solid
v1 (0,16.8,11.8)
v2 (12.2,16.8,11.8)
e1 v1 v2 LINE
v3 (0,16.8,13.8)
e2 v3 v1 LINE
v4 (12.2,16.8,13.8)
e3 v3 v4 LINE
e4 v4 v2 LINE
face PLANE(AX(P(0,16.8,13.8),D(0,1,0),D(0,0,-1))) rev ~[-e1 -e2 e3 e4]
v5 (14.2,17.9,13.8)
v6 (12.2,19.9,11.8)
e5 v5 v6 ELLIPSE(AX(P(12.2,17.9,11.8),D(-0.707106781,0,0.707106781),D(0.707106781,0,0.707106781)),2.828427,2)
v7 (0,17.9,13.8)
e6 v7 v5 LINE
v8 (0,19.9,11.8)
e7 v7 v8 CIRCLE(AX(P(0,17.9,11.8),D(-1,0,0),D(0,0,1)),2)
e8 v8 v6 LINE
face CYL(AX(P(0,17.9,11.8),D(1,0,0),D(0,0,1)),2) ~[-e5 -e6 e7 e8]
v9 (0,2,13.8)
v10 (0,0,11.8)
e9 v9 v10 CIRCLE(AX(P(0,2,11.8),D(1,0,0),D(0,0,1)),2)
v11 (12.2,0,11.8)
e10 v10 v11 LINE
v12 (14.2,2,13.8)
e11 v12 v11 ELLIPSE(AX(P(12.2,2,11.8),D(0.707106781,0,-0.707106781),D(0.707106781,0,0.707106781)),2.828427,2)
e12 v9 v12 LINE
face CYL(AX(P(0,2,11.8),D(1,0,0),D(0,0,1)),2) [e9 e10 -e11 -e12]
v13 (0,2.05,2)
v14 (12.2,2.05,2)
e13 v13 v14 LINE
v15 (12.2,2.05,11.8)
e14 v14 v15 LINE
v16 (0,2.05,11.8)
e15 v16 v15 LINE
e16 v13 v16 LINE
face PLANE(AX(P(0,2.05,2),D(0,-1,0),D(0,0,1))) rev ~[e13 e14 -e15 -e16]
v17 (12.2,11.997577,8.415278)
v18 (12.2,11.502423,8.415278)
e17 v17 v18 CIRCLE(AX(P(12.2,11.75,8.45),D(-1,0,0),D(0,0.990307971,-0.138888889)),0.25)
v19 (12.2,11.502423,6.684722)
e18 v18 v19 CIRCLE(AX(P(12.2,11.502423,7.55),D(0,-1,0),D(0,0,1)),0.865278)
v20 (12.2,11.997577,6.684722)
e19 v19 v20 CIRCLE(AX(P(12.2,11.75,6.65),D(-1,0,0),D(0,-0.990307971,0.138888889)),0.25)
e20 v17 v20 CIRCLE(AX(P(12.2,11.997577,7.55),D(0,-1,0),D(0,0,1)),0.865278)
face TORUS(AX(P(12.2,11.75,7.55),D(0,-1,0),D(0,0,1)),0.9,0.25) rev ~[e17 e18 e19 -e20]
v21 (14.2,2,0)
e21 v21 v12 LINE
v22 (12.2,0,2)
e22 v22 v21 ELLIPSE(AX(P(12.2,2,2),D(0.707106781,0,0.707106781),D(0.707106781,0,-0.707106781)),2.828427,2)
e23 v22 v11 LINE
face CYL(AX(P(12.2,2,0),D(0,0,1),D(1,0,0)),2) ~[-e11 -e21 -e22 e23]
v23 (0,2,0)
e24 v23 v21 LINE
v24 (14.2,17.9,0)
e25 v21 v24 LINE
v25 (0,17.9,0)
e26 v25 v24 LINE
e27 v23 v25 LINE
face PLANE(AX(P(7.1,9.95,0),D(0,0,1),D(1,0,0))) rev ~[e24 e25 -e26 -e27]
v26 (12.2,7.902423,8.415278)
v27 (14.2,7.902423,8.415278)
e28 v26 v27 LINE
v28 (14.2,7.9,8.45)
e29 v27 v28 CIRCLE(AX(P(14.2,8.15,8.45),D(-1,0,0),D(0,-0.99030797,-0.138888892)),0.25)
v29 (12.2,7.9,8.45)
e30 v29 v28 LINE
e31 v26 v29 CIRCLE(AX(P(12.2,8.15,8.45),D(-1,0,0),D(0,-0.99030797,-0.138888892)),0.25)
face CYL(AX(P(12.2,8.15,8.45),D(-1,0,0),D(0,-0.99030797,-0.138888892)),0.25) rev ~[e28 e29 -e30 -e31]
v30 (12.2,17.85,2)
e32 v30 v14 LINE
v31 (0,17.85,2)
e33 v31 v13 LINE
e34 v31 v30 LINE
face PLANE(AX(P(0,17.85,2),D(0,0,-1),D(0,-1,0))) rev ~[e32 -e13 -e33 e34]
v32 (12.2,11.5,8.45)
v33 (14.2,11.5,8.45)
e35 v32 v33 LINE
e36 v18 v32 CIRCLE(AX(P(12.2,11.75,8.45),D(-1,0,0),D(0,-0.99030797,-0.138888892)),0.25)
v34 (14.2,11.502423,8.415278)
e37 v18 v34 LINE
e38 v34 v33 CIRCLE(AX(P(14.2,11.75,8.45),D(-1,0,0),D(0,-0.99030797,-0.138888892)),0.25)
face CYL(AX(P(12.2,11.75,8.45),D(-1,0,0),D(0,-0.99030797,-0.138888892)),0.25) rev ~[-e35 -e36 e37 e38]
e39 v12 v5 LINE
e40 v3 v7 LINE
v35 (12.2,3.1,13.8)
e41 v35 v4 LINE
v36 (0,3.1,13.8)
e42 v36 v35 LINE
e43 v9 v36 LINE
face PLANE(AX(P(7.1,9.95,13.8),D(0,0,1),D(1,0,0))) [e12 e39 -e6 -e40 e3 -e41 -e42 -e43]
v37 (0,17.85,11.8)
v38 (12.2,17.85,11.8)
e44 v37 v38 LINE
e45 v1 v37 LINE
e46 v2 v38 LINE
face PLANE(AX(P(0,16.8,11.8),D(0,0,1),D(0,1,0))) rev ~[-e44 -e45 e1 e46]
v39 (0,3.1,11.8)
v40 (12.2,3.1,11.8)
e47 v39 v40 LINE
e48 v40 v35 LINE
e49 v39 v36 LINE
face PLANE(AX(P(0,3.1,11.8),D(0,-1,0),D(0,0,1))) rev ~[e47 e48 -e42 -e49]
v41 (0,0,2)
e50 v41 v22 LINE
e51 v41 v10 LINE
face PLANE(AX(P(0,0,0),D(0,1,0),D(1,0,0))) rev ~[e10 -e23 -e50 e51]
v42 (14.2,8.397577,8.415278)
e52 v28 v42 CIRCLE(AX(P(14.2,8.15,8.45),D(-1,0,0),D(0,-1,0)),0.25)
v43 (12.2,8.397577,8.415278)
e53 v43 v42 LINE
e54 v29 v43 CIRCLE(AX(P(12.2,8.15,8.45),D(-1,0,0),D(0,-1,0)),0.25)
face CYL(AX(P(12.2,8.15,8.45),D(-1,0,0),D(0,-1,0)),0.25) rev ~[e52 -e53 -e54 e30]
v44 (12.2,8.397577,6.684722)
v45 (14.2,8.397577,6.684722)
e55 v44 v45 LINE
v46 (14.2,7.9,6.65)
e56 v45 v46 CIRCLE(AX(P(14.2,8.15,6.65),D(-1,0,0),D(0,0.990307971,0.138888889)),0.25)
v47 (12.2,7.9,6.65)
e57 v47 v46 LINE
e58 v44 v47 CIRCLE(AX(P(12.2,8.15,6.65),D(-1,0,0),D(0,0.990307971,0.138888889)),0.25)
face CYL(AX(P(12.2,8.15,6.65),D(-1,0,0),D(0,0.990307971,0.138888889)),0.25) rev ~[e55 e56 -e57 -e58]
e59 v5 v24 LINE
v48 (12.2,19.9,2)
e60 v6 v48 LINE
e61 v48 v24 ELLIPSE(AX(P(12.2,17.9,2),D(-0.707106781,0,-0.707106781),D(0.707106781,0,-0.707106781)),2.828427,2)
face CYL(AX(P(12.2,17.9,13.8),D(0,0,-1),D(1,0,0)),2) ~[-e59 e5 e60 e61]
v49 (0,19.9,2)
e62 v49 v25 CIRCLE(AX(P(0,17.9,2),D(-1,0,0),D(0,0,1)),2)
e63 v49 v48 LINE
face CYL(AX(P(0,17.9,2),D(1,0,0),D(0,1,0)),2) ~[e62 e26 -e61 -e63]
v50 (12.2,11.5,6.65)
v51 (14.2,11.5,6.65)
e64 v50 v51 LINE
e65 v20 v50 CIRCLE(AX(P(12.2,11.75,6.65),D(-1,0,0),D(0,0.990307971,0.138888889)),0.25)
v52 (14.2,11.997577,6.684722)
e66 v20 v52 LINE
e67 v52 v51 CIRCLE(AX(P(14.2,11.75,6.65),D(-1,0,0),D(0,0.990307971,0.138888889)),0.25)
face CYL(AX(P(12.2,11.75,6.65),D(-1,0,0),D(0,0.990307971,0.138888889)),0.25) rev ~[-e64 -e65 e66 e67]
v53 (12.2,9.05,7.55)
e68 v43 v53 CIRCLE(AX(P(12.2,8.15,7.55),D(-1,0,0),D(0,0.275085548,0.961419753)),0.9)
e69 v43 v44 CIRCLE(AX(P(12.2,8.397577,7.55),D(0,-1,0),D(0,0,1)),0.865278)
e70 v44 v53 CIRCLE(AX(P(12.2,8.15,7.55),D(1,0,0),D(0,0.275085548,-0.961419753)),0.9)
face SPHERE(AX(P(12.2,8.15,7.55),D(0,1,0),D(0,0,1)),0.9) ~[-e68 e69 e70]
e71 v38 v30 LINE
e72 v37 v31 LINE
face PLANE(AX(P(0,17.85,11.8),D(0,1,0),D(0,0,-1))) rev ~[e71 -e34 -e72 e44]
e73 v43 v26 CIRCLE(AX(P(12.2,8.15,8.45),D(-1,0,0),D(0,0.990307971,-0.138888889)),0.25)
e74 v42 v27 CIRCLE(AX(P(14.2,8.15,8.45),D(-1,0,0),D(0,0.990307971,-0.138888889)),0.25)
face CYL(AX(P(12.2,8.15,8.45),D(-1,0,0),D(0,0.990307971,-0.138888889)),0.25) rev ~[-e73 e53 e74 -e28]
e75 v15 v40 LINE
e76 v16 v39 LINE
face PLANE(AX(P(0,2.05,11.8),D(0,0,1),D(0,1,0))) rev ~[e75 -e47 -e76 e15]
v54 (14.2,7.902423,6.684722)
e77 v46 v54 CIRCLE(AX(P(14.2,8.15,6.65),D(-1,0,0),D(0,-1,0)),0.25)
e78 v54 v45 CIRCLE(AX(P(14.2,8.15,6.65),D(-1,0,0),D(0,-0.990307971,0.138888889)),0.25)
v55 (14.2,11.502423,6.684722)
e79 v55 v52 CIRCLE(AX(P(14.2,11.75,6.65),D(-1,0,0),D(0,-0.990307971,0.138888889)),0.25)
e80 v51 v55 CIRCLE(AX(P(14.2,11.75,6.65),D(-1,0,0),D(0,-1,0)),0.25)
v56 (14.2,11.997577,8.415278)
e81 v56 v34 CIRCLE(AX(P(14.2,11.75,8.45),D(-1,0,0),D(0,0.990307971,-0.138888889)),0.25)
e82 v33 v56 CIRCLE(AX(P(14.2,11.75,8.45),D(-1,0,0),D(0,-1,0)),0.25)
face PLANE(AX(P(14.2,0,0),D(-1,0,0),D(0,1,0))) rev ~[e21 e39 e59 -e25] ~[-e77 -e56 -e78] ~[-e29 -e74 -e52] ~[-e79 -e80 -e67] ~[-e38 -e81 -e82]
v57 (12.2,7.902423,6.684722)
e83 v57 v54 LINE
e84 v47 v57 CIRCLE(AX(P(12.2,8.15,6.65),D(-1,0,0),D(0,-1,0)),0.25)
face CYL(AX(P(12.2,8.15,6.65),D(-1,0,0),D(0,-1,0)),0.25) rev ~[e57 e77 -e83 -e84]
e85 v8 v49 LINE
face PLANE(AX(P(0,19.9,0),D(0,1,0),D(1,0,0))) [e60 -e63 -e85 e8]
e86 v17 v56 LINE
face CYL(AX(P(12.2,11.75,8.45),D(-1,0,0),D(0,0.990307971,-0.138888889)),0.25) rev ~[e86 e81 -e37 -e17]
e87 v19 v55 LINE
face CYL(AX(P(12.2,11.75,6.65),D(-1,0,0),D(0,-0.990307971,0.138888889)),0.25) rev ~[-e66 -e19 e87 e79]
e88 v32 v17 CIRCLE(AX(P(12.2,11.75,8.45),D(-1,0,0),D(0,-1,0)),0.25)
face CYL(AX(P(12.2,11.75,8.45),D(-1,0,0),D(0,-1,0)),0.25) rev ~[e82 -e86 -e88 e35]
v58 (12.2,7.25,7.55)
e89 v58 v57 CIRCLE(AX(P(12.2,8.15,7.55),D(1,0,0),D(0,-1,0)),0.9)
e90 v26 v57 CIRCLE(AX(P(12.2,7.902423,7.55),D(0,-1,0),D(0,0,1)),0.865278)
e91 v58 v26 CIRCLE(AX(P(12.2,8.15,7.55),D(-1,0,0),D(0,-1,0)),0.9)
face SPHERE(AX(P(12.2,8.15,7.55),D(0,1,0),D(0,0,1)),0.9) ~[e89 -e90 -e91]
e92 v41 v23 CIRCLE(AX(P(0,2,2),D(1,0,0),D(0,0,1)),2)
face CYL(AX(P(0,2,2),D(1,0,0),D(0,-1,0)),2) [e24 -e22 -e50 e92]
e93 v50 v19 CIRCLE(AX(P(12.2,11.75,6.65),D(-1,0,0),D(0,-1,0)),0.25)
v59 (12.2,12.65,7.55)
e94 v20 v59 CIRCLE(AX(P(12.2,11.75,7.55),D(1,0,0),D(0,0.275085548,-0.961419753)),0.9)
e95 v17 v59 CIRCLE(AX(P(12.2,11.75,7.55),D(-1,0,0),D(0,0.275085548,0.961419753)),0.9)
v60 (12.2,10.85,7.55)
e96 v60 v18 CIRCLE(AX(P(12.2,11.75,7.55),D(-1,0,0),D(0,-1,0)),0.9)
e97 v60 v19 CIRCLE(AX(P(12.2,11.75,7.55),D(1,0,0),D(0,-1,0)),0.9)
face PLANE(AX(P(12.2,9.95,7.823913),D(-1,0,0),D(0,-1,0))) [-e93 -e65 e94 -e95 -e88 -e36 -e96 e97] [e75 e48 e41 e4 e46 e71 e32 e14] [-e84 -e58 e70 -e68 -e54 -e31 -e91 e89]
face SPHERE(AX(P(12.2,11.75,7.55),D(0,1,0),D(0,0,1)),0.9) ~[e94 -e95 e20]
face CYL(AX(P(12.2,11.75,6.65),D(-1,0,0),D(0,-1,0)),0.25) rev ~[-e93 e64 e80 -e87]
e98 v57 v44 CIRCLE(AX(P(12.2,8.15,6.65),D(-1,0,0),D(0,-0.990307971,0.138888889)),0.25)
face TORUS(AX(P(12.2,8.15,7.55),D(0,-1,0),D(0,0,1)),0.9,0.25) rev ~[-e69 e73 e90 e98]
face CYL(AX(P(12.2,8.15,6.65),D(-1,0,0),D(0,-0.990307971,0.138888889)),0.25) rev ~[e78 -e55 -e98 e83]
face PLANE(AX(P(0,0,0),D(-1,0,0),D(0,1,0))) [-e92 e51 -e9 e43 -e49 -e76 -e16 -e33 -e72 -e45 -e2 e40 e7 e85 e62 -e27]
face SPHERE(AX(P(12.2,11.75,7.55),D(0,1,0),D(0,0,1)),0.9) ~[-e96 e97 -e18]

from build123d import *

# Parameters (mm, degrees)
F0_W     = 14.2
F0_H     = 19.9
F1_DEPTH = 13.8
F2_DEPTH = 12
F4_DEPTH = 12.2
F6_DEPTH = 2.001
F7_ANGLE = 180
F8_R     = 2


with BuildPart() as f1:
    # F0 (on Top) → F1 (new body)
    with BuildSketch(Plane.XY):
        with Locations((7.1, 9.95)):
            Rectangle(F0_W, F0_H)
    extrude(amount=F1_DEPTH)

    # F0 (on Top) → F2 (join)
    with BuildSketch(Plane.XY):
        with Locations((7.1, 9.95)):
            Rectangle(F0_W, F0_H)
    extrude(amount=F2_DEPTH)

    # F3 (on face) → F4 (cut)
    with BuildSketch(Plane(origin=(0, 0, 0), x_dir=(0, -1, 0), z_dir=(-1, 0, 0))):
        Polygon((-3.1, 13.8), (-16.8, 13.8), (-16.8, 11.8), (-17.85, 11.8), (-17.85, 2), (-2.05, 2), (-2.05, 11.8), (-3.1, 11.8), align=None)
    extrude(amount=-F4_DEPTH, mode=Mode.SUBTRACT)

    # F5 (on face) → F6 (cut, through all)
    with BuildSketch(Plane(origin=(12.2, 0, 0), x_dir=(0, -1, 0), z_dir=(-1, 0, 0))):
        with BuildLine():
            ThreePointArc((-11.9975769926, 8.4152777778), (-11.75, 8.2), (-11.5024230074, 8.4152777778))
            ThreePointArc((-11.5024230074, 8.4152777778), (-11.75, 8.45), (-11.9975769926, 8.4152777778))
        make_face()
        with BuildLine():
            ThreePointArc((-11.9975769926, 8.4152777778), (-11.75, 8.45), (-11.5024230074, 8.4152777778))
            ThreePointArc((-11.5024230074, 8.4152777778), (-11.5006064875, 8.4325966693), (-11.5, 8.45))
            ThreePointArc((-11.5, 8.45), (-11.7674033307, 8.6993935125), (-11.9975769926, 8.4152777778))
        make_face()
        with BuildLine():
            ThreePointArc((-8.3975769926, 8.4152777778), (-8.15, 8.2), (-7.9024230074, 8.4152777778))
            ThreePointArc((-7.9024230074, 8.4152777778), (-8.15, 8.45), (-8.3975769926, 8.4152777778))
        make_face()
        with BuildLine():
            ThreePointArc((-8.3975769926, 8.4152777778), (-8.15, 8.45), (-7.9024230074, 8.4152777778))
            ThreePointArc((-7.9024230074, 8.4152777778), (-7.9006064875, 8.4325966693), (-7.9, 8.45))
            ThreePointArc((-7.9, 8.45), (-8.1674033307, 8.6993935125), (-8.3975769926, 8.4152777778))
        make_face()
        with BuildLine():
            ThreePointArc((-8.3975769926, 6.6847222222), (-8.15, 6.65), (-7.9024230074, 6.6847222222))
            ThreePointArc((-7.9024230074, 6.6847222222), (-8.15, 6.9), (-8.3975769926, 6.6847222222))
        make_face()
        with BuildLine():
            ThreePointArc((-7.9, 6.65), (-7.9006064875, 6.6674033307), (-7.9024230074, 6.6847222222))
            ThreePointArc((-7.9024230074, 6.6847222222), (-8.15, 6.65), (-8.3975769926, 6.6847222222))
            ThreePointArc((-8.3975769926, 6.6847222222), (-8.1674033307, 6.4006064875), (-7.9, 6.65))
        make_face()
        with BuildLine():
            ThreePointArc((-11.9975769926, 6.6847222222), (-11.75, 6.65), (-11.5024230074, 6.6847222222))
            ThreePointArc((-11.5024230074, 6.6847222222), (-11.75, 6.9), (-11.9975769926, 6.6847222222))
        make_face()
        with BuildLine():
            ThreePointArc((-11.5, 6.65), (-11.5006064875, 6.6674033307), (-11.5024230074, 6.6847222222))
            ThreePointArc((-11.5024230074, 6.6847222222), (-11.75, 6.65), (-11.9975769926, 6.6847222222))
            ThreePointArc((-11.9975769926, 6.6847222222), (-11.7674033307, 6.4006064875), (-11.5, 6.65))
        make_face()
    extrude(amount=-F6_DEPTH, mode=Mode.SUBTRACT)

    # F5 (on face) → F7 (revolve)
    with BuildSketch(Plane(origin=(12.2, 0, 0), x_dir=(0, -1, 0), z_dir=(-1, 0, 0))):
        with BuildLine():
            Line((-12.65, 7.55), (-10.85, 7.55))
            ThreePointArc((-10.85, 7.55), (-11.0313835191, 8.0918397856), (-11.5024230074, 8.4152777778))
            ThreePointArc((-11.5024230074, 8.4152777778), (-11.75, 8.2), (-11.9975769926, 8.4152777778))
            ThreePointArc((-11.9975769926, 8.4152777778), (-12.4686164809, 8.0918397856), (-12.65, 7.55))
        make_face()
        with BuildLine():
            Line((-9.05, 7.55), (-7.25, 7.55))
            ThreePointArc((-7.25, 7.55), (-7.4313835191, 8.0918397856), (-7.9024230074, 8.4152777778))
            ThreePointArc((-7.9024230074, 8.4152777778), (-8.15, 8.2), (-8.3975769926, 8.4152777778))
            ThreePointArc((-8.3975769926, 8.4152777778), (-8.8686164809, 8.0918397856), (-9.05, 7.55))
        make_face()
    revolve(axis=Axis((12.2, 11.75, 7.55), (0, -1, 0)), revolution_arc=F7_ANGLE)

    # F8
    f8_edges = [f1.edges().sort_by_distance(p)[0] for p in [
        (7.1, 0, 0),
        (7.1, 19.9, 0),
        (7.1, 19.9, 13.8),
        (7.1, 0, 13.8),
        (14.2, 0, 6.9),
        (14.2, 19.9, 6.9),
    ]]
    fillet(f8_edges, radius=F8_R)


solid = f1.part
